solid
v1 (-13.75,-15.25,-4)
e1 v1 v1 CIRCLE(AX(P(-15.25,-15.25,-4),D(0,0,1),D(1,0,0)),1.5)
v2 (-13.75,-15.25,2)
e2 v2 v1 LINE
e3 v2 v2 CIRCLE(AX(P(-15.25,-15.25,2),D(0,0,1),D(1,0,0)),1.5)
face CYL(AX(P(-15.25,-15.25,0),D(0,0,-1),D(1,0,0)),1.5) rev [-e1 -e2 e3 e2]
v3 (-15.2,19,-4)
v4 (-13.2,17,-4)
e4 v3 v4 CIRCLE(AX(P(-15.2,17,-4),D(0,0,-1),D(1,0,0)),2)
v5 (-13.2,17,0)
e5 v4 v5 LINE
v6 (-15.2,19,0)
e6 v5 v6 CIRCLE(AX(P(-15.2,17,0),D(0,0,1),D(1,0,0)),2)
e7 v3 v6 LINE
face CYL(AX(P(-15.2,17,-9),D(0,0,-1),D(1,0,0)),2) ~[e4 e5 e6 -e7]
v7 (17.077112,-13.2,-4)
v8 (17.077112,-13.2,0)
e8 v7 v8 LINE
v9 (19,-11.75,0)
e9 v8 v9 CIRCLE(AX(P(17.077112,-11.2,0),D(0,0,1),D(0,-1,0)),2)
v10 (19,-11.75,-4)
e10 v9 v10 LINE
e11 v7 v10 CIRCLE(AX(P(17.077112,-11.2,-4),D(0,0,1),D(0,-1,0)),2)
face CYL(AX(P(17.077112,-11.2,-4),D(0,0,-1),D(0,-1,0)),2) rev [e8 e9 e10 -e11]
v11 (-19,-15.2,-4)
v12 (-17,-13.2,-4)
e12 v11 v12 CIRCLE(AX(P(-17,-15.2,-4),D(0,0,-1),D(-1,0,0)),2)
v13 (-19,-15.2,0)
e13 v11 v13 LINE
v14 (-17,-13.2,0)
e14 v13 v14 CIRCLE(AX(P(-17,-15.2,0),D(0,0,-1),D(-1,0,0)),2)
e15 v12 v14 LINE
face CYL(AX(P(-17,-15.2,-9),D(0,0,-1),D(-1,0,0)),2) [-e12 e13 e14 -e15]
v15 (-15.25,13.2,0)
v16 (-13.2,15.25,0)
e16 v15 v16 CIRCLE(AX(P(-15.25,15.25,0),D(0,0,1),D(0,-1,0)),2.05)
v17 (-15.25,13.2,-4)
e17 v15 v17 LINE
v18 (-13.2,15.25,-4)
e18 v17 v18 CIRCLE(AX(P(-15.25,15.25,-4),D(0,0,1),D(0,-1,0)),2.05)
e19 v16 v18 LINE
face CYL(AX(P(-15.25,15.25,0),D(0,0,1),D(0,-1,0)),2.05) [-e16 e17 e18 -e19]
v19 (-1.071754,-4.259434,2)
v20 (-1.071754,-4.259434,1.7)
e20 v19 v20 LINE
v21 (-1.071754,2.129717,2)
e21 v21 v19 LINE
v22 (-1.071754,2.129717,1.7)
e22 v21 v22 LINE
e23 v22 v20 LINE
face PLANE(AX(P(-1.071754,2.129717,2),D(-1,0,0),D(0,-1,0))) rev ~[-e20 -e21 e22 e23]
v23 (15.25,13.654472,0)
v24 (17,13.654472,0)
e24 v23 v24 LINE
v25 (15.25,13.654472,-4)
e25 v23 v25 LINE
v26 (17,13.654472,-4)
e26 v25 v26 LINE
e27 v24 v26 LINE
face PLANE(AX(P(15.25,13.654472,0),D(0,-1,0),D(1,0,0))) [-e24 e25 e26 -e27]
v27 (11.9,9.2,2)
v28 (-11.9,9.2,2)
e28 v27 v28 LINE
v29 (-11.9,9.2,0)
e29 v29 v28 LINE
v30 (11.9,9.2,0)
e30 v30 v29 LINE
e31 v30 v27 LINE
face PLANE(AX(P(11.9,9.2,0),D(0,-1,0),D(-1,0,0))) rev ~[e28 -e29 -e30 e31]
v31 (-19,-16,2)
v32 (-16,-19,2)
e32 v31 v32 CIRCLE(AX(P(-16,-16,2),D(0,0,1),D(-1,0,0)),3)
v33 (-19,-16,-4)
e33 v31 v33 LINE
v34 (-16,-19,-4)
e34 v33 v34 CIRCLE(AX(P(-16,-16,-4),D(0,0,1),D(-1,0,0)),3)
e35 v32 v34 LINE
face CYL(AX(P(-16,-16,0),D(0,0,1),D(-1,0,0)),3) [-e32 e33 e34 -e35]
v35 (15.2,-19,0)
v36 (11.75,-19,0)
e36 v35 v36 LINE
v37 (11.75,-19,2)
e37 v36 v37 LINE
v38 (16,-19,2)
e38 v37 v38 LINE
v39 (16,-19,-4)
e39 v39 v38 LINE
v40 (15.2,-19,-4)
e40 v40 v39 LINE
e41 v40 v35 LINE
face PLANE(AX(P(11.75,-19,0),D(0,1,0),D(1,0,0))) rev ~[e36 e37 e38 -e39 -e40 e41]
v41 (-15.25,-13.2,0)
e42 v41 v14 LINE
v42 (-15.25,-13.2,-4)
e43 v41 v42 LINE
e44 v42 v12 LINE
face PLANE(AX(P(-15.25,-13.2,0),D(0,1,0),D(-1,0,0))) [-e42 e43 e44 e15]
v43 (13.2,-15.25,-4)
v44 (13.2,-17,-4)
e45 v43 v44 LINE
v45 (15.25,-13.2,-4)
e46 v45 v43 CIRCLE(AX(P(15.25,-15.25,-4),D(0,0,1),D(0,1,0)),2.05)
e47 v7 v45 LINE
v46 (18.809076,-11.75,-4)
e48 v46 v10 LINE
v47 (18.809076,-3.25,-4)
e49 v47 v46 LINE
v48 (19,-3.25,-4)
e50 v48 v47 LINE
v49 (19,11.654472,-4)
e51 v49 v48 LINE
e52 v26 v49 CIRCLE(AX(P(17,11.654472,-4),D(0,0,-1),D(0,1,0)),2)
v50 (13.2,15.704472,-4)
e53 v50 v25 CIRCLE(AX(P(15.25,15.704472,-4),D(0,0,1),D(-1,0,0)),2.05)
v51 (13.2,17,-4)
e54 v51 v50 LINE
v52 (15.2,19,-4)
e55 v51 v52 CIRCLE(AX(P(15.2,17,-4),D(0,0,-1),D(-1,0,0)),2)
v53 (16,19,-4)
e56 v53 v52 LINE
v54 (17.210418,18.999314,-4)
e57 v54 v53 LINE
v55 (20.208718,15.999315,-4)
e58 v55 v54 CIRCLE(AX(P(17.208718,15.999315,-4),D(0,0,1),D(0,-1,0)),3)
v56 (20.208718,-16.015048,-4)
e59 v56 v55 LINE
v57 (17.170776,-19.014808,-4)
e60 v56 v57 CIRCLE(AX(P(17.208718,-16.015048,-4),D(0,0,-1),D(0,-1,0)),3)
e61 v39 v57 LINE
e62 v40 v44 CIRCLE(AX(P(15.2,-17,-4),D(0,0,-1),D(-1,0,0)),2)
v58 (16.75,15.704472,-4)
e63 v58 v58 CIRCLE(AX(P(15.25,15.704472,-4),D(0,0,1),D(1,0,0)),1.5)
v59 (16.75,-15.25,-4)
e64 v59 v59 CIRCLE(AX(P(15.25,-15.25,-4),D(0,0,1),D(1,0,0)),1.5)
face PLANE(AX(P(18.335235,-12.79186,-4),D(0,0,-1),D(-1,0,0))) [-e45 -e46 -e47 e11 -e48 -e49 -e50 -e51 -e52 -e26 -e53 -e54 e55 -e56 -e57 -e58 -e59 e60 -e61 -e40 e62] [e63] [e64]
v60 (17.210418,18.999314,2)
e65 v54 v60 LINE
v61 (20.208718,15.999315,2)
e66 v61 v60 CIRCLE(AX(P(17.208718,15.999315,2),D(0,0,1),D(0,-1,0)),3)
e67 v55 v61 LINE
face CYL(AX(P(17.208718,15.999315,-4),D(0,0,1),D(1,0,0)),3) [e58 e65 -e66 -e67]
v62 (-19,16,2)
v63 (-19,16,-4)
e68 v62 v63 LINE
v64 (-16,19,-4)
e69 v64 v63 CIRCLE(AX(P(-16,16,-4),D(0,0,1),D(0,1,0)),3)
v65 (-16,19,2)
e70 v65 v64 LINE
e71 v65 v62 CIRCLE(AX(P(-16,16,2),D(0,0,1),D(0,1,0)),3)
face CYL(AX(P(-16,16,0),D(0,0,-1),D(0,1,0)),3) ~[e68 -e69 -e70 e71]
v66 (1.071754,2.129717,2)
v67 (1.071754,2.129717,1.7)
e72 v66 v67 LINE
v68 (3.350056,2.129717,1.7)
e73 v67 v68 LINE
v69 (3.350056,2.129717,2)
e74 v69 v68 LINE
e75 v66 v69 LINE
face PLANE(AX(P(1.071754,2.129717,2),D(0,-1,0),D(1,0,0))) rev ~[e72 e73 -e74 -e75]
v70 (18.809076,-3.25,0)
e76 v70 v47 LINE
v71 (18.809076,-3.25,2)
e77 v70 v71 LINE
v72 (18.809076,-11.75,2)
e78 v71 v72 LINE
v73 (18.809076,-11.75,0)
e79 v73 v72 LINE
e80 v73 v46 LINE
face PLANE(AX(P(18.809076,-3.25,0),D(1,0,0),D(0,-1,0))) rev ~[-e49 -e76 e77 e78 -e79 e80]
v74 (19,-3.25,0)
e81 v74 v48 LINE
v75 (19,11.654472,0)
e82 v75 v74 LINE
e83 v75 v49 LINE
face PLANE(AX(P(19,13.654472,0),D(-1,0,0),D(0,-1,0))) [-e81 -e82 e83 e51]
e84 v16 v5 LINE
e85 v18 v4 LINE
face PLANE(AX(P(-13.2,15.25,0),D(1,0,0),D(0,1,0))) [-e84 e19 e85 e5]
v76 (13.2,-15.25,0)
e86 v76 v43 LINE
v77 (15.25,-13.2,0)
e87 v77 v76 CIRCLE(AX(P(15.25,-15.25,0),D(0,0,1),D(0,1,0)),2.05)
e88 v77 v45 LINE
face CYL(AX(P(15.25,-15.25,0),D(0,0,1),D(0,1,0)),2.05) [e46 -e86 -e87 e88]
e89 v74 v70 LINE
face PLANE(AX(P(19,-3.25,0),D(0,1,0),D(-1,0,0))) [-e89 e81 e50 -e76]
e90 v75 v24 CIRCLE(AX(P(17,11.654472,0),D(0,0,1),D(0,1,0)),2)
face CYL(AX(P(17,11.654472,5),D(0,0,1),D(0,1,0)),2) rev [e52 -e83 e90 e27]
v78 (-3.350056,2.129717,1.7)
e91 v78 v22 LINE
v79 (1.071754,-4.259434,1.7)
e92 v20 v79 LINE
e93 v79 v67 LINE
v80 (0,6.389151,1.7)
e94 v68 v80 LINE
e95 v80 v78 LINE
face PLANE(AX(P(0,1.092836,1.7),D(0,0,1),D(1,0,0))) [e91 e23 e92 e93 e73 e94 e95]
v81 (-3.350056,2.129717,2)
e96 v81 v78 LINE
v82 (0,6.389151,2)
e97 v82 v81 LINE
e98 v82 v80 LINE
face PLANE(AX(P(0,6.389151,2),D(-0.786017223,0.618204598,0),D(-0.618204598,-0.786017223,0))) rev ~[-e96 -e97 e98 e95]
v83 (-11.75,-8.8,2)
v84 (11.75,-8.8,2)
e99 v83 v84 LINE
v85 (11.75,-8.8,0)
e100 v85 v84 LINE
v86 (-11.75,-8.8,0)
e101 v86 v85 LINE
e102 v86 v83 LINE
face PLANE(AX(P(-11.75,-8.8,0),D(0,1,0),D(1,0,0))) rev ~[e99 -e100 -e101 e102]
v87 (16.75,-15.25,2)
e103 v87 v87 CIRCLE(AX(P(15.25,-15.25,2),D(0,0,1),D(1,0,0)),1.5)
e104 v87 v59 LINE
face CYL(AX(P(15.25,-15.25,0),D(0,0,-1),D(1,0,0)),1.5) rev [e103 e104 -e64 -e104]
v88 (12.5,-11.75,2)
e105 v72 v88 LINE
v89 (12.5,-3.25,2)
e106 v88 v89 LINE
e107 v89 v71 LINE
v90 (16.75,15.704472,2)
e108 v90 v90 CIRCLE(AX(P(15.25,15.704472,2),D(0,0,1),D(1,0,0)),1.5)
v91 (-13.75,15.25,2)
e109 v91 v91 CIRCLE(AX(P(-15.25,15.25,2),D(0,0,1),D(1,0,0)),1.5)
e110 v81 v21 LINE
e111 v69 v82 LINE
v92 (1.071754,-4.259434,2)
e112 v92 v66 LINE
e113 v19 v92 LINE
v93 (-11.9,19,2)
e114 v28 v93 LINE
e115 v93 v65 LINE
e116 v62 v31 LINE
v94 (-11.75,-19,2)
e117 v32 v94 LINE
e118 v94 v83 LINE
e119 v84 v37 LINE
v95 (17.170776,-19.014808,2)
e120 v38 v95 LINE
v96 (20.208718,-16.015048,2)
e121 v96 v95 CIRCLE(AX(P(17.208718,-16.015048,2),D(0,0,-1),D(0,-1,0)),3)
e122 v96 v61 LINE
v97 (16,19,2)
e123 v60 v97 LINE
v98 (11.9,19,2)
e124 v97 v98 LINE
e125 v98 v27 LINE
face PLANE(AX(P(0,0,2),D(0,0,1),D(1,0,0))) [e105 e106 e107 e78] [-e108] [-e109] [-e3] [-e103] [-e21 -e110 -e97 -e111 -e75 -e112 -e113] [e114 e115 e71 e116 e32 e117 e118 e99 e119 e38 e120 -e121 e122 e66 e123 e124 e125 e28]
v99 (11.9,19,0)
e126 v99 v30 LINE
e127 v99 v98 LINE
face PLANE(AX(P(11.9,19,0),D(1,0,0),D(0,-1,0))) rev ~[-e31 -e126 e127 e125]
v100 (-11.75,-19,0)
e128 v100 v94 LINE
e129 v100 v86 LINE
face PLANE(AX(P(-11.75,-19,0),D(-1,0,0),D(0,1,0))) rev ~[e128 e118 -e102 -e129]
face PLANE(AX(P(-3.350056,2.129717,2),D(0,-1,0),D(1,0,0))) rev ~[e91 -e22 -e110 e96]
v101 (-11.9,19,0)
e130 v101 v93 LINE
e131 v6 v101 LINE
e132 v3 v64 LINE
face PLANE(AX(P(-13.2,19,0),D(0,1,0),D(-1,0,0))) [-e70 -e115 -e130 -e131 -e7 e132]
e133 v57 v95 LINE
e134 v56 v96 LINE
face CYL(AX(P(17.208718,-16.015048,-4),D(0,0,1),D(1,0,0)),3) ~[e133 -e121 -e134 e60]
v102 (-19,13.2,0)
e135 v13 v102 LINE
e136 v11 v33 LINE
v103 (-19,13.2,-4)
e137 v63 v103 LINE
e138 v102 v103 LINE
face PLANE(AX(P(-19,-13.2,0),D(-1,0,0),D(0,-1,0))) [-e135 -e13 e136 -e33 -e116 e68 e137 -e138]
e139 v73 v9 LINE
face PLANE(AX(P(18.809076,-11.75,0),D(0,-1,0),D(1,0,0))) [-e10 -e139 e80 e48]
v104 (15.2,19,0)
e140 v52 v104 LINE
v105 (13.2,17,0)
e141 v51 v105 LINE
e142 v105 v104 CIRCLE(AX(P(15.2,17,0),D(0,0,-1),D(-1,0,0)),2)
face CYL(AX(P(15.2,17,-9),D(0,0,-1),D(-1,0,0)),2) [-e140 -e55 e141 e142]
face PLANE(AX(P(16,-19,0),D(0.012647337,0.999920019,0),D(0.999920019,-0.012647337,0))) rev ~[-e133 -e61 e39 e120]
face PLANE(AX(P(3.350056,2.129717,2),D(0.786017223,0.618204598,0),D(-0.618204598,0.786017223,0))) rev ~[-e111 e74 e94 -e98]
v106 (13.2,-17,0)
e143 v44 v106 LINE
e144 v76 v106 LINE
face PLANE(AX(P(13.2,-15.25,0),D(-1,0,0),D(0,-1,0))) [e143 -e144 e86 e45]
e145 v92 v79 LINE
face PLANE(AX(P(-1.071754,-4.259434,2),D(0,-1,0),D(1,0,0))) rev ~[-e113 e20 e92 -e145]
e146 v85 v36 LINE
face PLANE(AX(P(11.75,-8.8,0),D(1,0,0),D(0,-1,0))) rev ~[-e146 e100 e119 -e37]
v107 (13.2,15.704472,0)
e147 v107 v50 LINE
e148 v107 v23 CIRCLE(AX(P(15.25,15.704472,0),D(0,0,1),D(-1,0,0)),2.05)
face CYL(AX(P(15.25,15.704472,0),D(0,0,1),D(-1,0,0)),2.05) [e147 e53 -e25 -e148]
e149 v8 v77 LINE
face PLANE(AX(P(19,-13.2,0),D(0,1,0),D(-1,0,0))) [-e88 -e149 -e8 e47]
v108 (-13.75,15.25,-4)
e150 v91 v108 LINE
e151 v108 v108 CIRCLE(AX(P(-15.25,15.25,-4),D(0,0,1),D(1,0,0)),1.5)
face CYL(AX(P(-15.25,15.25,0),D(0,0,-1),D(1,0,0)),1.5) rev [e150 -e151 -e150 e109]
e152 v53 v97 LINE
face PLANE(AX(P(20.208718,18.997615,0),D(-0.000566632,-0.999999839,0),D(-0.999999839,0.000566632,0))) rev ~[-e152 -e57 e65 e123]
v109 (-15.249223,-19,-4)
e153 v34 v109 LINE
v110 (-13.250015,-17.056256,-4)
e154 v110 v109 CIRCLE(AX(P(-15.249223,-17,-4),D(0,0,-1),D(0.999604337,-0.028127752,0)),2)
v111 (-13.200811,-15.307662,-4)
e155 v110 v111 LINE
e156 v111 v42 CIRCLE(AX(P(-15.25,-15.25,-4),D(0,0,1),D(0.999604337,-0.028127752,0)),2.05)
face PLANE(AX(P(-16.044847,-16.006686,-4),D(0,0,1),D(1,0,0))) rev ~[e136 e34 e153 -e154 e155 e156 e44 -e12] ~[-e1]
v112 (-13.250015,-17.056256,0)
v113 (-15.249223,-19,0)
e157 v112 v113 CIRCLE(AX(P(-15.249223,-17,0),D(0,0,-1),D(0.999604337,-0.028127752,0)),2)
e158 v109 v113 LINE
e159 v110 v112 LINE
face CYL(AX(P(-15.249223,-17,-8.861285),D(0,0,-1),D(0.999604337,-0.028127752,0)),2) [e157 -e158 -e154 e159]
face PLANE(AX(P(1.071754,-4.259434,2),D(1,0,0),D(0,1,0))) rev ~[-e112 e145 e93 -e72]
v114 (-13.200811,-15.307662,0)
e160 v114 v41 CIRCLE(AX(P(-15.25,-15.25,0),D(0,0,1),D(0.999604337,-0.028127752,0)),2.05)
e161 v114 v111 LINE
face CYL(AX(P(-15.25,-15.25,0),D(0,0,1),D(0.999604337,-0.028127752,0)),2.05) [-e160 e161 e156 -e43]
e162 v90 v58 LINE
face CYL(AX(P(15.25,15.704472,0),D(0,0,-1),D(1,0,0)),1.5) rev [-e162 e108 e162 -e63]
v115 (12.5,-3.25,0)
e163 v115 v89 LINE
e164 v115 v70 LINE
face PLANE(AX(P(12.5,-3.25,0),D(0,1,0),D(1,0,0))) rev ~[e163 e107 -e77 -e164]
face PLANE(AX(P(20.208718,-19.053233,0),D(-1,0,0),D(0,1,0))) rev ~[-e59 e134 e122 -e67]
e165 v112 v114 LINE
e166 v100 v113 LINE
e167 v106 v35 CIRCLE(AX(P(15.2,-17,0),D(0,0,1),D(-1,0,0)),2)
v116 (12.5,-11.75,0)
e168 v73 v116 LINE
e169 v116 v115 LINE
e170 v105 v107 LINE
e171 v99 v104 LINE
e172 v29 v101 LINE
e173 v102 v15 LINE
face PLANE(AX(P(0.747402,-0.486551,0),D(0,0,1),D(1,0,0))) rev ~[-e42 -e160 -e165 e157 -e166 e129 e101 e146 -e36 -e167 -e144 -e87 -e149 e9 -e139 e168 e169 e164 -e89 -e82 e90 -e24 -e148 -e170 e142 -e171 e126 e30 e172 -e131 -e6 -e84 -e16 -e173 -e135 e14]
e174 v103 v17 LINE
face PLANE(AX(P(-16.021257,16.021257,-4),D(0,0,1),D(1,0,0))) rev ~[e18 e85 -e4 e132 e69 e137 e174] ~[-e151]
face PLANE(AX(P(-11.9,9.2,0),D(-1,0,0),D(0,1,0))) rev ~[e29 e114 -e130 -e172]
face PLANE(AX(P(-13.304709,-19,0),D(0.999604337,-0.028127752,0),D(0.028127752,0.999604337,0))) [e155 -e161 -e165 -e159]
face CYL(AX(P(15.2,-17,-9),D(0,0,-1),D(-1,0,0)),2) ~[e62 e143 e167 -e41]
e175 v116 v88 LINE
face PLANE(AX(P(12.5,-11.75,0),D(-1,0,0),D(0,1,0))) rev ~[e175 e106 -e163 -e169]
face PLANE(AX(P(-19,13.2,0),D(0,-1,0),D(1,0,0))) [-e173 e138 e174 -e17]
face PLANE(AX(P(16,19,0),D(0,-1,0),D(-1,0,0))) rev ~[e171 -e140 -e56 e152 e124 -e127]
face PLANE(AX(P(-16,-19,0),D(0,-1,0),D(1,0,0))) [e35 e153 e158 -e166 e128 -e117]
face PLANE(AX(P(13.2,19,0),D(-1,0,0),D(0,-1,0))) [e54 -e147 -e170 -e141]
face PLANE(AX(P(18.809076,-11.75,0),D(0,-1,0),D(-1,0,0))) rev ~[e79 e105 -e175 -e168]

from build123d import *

# Parameters (mm, degrees)
F0_R         = 1.5
F1_DEPTH     = 2
F2_DEPTH     = 4
F3_T1_DEPTH  = 9
F4_T4_DEPTH  = 9
F4_T6_DEPTH  = 4
F4_T8_DEPTH  = 9
F4_T10_DEPTH = 8.8612846748
F4_T12_DEPTH = 9
F4_T14_DEPTH = 9
F5_R         = 3
F6_R         = 3
F8_DEPTH     = 0.3


# Not quite as in the source:
# - a fillet or chamfer that OpenCascade refuses, or shapes differently, is made with other operations: its cross-section is extruded or revolved along the edge and cut away or added


with BuildPart() as f1:
    # F0 (on Top) → F1 (new body)
    with BuildSketch(Plane.XY):
        with BuildLine():
            Line((11.75, -19), (13.2, -19))
            Line((13.2, -19), (13.2, -15.25))
            ThreePointArc((13.2, -15.25), (13.8004310986, -13.8004310986), (15.25, -13.2))
            Line((15.25, -13.2), (19, -13.2))
            Line((19, -13.2), (19, -11.75))
            Line((19, -11.75), (18.8090763986, -11.75))
            Line((18.8090763986, -11.75), (12.5, -11.75))
            Line((12.5, -11.75), (12.5, -3.25))
            Line((12.5, -3.25), (18.8090763986, -3.25))
            Line((18.8090763986, -3.25), (19, -3.25))
            Line((19, -3.25), (19, 13.6544716179))
            Line((19, 13.6544716179), (15.25, 13.6544716179))
            ThreePointArc((15.25, 13.6544716179), (13.8004310986, 14.2549027165), (13.2, 15.7044716179))
            Line((13.2, 15.7044716179), (13.2, 19))
            Line((13.2, 19), (11.9, 19))
            Line((11.9, 19), (11.9, 9.2))
            Line((11.9, 9.2), (0, 9.2))
            Line((0, 9.2), (-11.9, 9.2))
            Line((-11.9, 9.2), (-11.9, 19))
            Line((-11.9, 19), (-13.2, 19))
            Line((-13.2, 19), (-13.2, 15.25))
            ThreePointArc((-13.2, 15.25), (-13.8004310986, 13.8004310986), (-15.25, 13.2))
            Line((-15.25, 13.2), (-19, 13.2))
            Line((-19, 13.2), (-19, -13.2))
            Line((-19, -13.2), (-15.25, -13.2))
            ThreePointArc((-15.25, -13.2), (-13.7801859172, -13.8209630649), (-13.2008111101, -15.3076618908))
            Line((-13.2008111101, -15.3076618908), (-13.304709388, -19))
            Line((-13.304709388, -19), (-11.75, -19))
            Line((-11.75, -19), (-11.75, -8.8))
            Line((-11.75, -8.8), (11.75, -8.8))
            Line((11.75, -8.8), (11.75, -19))
        make_face()
        with BuildLine():
            Line((-19, 16), (-19, 13.2))
            Line((-19, 13.2), (-15.25, 13.2))
            ThreePointArc((-15.25, 13.2), (-13.8004310986, 13.8004310986), (-13.2, 15.25))
            Line((-13.2, 15.25), (-13.2, 19))
            Line((-13.2, 19), (-16, 19))
            ThreePointArc((-16, 19), (-18.1213203436, 18.1213203436), (-19, 16))
        make_face()
        with Locations((-15.25, 15.25)):
            Circle(F0_R, mode=Mode.SUBTRACT)
        with BuildLine():
            Line((13.2, -19), (16, -19))
            Line((16, -19), (20.2087182552, -19.0532333363))
            Line((20.2087182552, -19.0532333363), (20.2087182552, 18.9976152033))
            Line((20.2087182552, 18.9976152033), (16, 19))
            Line((16, 19), (13.2, 19))
            Line((13.2, 19), (13.2, 15.7044716179))
            ThreePointArc((13.2, 15.7044716179), (13.8004310986, 14.2549027165), (15.25, 13.6544716179))
            Line((15.25, 13.6544716179), (19, 13.6544716179))
            Line((19, 13.6544716179), (19, -3.25))
            Line((19, -3.25), (18.8090763986, -3.25))
            Line((18.8090763986, -3.25), (18.8090763986, -11.75))
            Line((18.8090763986, -11.75), (19, -11.75))
            Line((19, -11.75), (19, -13.2))
            Line((19, -13.2), (15.25, -13.2))
            ThreePointArc((15.25, -13.2), (13.8004310986, -13.8004310986), (13.2, -15.25))
            Line((13.2, -15.25), (13.2, -19))
        make_face()
        with Locations((15.25, -15.25)):
            Circle(F0_R, mode=Mode.SUBTRACT)
        with Locations((15.25, 15.7044716179)):
            Circle(F0_R, mode=Mode.SUBTRACT)
        with BuildLine():
            Line((-16, -19), (-13.304709388, -19))
            Line((-13.304709388, -19), (-13.2008111101, -15.3076618908))
            ThreePointArc((-13.2008111101, -15.3076618908), (-13.7801859172, -13.8209630649), (-15.25, -13.2))
            Line((-15.25, -13.2), (-19, -13.2))
            Line((-19, -13.2), (-19, -16))
            ThreePointArc((-19, -16), (-18.1213203436, -18.1213203436), (-16, -19))
        make_face()
        with Locations((-15.25, -15.25)):
            Circle(F0_R, mode=Mode.SUBTRACT)
    extrude(amount=F1_DEPTH)

    # F0 (on Top) → F2 (join)
    with BuildSketch(Plane.XY):
        with BuildLine():
            Line((-16, -19), (-13.304709388, -19))
            Line((-13.304709388, -19), (-13.2008111101, -15.3076618908))
            ThreePointArc((-13.2008111101, -15.3076618908), (-13.7801859172, -13.8209630649), (-15.25, -13.2))
            Line((-15.25, -13.2), (-19, -13.2))
            Line((-19, -13.2), (-19, -16))
            ThreePointArc((-19, -16), (-18.1213203436, -18.1213203436), (-16, -19))
        make_face()
        with Locations((-15.25, -15.25)):
            Circle(F0_R, mode=Mode.SUBTRACT)
        with BuildLine():
            Line((13.2, -19), (16, -19))
            Line((16, -19), (20.2087182552, -19.0532333363))
            Line((20.2087182552, -19.0532333363), (20.2087182552, 18.9976152033))
            Line((20.2087182552, 18.9976152033), (16, 19))
            Line((16, 19), (13.2, 19))
            Line((13.2, 19), (13.2, 15.7044716179))
            ThreePointArc((13.2, 15.7044716179), (13.8004310986, 14.2549027165), (15.25, 13.6544716179))
            Line((15.25, 13.6544716179), (19, 13.6544716179))
            Line((19, 13.6544716179), (19, -3.25))
            Line((19, -3.25), (18.8090763986, -3.25))
            Line((18.8090763986, -3.25), (18.8090763986, -11.75))
            Line((18.8090763986, -11.75), (19, -11.75))
            Line((19, -11.75), (19, -13.2))
            Line((19, -13.2), (15.25, -13.2))
            ThreePointArc((15.25, -13.2), (13.8004310986, -13.8004310986), (13.2, -15.25))
            Line((13.2, -15.25), (13.2, -19))
        make_face()
        with Locations((15.25, -15.25)):
            Circle(F0_R, mode=Mode.SUBTRACT)
        with Locations((15.25, 15.7044716179)):
            Circle(F0_R, mode=Mode.SUBTRACT)
        with BuildLine():
            Line((-19, 16), (-19, 13.2))
            Line((-19, 13.2), (-15.25, 13.2))
            ThreePointArc((-15.25, 13.2), (-13.8004310986, 13.8004310986), (-13.2, 15.25))
            Line((-13.2, 15.25), (-13.2, 19))
            Line((-13.2, 19), (-16, 19))
            ThreePointArc((-16, 19), (-18.1213203436, 18.1213203436), (-19, 16))
        make_face()
        with Locations((-15.25, 15.25)):
            Circle(F0_R, mode=Mode.SUBTRACT)
    extrude(amount=-F2_DEPTH)

    # F3: fillet of radius 2 on 1 edges, made by hand

    # F3_s2 → F3_t1 (cut)
    with BuildSketch(Plane.XY.offset(-9)):
        with BuildLine():
            ThreePointArc((-13.2, 17), (-13.7857864376, 18.4142135624), (-15.2, 19))
            Line((-15.2, 19), (-13.2, 19))
            Line((-13.2, 19), (-13.2, 17))
        make_face()
    extrude(amount=F3_T1_DEPTH, mode=Mode.SUBTRACT)

    # F4: fillet of radius 2 on 6 edges, made by hand


with BuildPart() as f4_tool2:
    # F4_s3 → F4_t4 (new body)
    with BuildSketch(Plane.XY.offset(5)):
        with BuildLine():
            ThreePointArc((17, 13.6544716179), (18.4142135624, 13.0686851803), (19, 11.6544716179))
            Line((19, 11.6544716179), (19, 13.6544716179))
            Line((19, 13.6544716179), (17, 13.6544716179))
        make_face()
    extrude(amount=-F4_T4_DEPTH)

    split(bisect_by=Plane.XY.offset(2), keep=Keep.BOTTOM)


with BuildPart() as f1_1:
    add(f1.part)

    # F4_t1: union F4_tool2
    add(f4_tool2.part)

    # F4_s7 → F4_t6 (join)
    with BuildSketch(Plane.XY.offset(-4)):
        with BuildLine():
            ThreePointArc((17.0771115477, -13.2), (18.2812710056, -12.7968719423), (19, -11.75))
            Line((19, -11.75), (19, -13.2))
            Line((19, -13.2), (17.0771115477, -13.2))
        make_face()
    extrude(amount=F4_T6_DEPTH)

    # F4_s9 → F4_t8 (cut)
    with BuildSketch(Plane.XY.offset(-9)):
        with BuildLine():
            ThreePointArc((-19, -15.2), (-18.4142135624, -13.7857864376), (-17, -13.2))
            Line((-17, -13.2), (-19, -13.2))
            Line((-19, -13.2), (-19, -15.2))
        make_face()
    extrude(amount=F4_T8_DEPTH, mode=Mode.SUBTRACT)

    # F4_s11 → F4_t10 (cut)
    with BuildSketch(Plane.XY.offset(-8.8612846748)):
        with BuildLine():
            ThreePointArc((-13.2500145849, -17.0562555032), (-13.8550408822, -18.4339649588), (-15.249223258, -19))
            Line((-15.249223258, -19), (-13.304709388, -19))
            Line((-13.304709388, -19), (-13.2500145849, -17.0562555032))
        make_face()
    extrude(amount=F4_T10_DEPTH, mode=Mode.SUBTRACT)

    # F4_s13 → F4_t12 (cut)
    with BuildSketch(Plane.XY.offset(-9)):
        with BuildLine():
            ThreePointArc((13.2, 17), (13.7857864376, 18.4142135624), (15.2, 19))
            Line((15.2, 19), (13.2, 19))
            Line((13.2, 19), (13.2, 17))
        make_face()
    extrude(amount=F4_T12_DEPTH, mode=Mode.SUBTRACT)

    # F4_s15 → F4_t14 (cut)
    with BuildSketch(Plane.XY.offset(-9)):
        with BuildLine():
            ThreePointArc((13.2, -17), (13.7857864376, -18.4142135624), (15.2, -19))
            Line((15.2, -19), (13.2, -19))
            Line((13.2, -19), (13.2, -17))
        make_face()
    extrude(amount=F4_T14_DEPTH, mode=Mode.SUBTRACT)

    # F5
    f5_edges = [f1_1.edges().sort_by_distance(p)[0] for p in [
        (20.208718, -19.053233, -1),
    ]]
    fillet(f5_edges, radius=F5_R)

    # F6
    f6_edges = [f1_1.edges().sort_by_distance(p)[0] for p in [
        (20.208718, 18.997615, -1),
    ]]
    fillet(f6_edges, radius=F6_R)

    # F7 (on face) → F8 (cut)
    with BuildSketch(Plane.XY.offset(2)):
        Polygon((-1.0717540281, -4.259434063), (1.0717540281, -4.259434063), (1.0717540281, 2.1297170315), (3.3500560094, 2.1297170315), (0, 6.3891510945), (-3.3500560094, 2.1297170315), (-1.0717540281, 2.1297170315), align=None)
    extrude(amount=-F8_DEPTH, mode=Mode.SUBTRACT)


solid = f1_1.part
